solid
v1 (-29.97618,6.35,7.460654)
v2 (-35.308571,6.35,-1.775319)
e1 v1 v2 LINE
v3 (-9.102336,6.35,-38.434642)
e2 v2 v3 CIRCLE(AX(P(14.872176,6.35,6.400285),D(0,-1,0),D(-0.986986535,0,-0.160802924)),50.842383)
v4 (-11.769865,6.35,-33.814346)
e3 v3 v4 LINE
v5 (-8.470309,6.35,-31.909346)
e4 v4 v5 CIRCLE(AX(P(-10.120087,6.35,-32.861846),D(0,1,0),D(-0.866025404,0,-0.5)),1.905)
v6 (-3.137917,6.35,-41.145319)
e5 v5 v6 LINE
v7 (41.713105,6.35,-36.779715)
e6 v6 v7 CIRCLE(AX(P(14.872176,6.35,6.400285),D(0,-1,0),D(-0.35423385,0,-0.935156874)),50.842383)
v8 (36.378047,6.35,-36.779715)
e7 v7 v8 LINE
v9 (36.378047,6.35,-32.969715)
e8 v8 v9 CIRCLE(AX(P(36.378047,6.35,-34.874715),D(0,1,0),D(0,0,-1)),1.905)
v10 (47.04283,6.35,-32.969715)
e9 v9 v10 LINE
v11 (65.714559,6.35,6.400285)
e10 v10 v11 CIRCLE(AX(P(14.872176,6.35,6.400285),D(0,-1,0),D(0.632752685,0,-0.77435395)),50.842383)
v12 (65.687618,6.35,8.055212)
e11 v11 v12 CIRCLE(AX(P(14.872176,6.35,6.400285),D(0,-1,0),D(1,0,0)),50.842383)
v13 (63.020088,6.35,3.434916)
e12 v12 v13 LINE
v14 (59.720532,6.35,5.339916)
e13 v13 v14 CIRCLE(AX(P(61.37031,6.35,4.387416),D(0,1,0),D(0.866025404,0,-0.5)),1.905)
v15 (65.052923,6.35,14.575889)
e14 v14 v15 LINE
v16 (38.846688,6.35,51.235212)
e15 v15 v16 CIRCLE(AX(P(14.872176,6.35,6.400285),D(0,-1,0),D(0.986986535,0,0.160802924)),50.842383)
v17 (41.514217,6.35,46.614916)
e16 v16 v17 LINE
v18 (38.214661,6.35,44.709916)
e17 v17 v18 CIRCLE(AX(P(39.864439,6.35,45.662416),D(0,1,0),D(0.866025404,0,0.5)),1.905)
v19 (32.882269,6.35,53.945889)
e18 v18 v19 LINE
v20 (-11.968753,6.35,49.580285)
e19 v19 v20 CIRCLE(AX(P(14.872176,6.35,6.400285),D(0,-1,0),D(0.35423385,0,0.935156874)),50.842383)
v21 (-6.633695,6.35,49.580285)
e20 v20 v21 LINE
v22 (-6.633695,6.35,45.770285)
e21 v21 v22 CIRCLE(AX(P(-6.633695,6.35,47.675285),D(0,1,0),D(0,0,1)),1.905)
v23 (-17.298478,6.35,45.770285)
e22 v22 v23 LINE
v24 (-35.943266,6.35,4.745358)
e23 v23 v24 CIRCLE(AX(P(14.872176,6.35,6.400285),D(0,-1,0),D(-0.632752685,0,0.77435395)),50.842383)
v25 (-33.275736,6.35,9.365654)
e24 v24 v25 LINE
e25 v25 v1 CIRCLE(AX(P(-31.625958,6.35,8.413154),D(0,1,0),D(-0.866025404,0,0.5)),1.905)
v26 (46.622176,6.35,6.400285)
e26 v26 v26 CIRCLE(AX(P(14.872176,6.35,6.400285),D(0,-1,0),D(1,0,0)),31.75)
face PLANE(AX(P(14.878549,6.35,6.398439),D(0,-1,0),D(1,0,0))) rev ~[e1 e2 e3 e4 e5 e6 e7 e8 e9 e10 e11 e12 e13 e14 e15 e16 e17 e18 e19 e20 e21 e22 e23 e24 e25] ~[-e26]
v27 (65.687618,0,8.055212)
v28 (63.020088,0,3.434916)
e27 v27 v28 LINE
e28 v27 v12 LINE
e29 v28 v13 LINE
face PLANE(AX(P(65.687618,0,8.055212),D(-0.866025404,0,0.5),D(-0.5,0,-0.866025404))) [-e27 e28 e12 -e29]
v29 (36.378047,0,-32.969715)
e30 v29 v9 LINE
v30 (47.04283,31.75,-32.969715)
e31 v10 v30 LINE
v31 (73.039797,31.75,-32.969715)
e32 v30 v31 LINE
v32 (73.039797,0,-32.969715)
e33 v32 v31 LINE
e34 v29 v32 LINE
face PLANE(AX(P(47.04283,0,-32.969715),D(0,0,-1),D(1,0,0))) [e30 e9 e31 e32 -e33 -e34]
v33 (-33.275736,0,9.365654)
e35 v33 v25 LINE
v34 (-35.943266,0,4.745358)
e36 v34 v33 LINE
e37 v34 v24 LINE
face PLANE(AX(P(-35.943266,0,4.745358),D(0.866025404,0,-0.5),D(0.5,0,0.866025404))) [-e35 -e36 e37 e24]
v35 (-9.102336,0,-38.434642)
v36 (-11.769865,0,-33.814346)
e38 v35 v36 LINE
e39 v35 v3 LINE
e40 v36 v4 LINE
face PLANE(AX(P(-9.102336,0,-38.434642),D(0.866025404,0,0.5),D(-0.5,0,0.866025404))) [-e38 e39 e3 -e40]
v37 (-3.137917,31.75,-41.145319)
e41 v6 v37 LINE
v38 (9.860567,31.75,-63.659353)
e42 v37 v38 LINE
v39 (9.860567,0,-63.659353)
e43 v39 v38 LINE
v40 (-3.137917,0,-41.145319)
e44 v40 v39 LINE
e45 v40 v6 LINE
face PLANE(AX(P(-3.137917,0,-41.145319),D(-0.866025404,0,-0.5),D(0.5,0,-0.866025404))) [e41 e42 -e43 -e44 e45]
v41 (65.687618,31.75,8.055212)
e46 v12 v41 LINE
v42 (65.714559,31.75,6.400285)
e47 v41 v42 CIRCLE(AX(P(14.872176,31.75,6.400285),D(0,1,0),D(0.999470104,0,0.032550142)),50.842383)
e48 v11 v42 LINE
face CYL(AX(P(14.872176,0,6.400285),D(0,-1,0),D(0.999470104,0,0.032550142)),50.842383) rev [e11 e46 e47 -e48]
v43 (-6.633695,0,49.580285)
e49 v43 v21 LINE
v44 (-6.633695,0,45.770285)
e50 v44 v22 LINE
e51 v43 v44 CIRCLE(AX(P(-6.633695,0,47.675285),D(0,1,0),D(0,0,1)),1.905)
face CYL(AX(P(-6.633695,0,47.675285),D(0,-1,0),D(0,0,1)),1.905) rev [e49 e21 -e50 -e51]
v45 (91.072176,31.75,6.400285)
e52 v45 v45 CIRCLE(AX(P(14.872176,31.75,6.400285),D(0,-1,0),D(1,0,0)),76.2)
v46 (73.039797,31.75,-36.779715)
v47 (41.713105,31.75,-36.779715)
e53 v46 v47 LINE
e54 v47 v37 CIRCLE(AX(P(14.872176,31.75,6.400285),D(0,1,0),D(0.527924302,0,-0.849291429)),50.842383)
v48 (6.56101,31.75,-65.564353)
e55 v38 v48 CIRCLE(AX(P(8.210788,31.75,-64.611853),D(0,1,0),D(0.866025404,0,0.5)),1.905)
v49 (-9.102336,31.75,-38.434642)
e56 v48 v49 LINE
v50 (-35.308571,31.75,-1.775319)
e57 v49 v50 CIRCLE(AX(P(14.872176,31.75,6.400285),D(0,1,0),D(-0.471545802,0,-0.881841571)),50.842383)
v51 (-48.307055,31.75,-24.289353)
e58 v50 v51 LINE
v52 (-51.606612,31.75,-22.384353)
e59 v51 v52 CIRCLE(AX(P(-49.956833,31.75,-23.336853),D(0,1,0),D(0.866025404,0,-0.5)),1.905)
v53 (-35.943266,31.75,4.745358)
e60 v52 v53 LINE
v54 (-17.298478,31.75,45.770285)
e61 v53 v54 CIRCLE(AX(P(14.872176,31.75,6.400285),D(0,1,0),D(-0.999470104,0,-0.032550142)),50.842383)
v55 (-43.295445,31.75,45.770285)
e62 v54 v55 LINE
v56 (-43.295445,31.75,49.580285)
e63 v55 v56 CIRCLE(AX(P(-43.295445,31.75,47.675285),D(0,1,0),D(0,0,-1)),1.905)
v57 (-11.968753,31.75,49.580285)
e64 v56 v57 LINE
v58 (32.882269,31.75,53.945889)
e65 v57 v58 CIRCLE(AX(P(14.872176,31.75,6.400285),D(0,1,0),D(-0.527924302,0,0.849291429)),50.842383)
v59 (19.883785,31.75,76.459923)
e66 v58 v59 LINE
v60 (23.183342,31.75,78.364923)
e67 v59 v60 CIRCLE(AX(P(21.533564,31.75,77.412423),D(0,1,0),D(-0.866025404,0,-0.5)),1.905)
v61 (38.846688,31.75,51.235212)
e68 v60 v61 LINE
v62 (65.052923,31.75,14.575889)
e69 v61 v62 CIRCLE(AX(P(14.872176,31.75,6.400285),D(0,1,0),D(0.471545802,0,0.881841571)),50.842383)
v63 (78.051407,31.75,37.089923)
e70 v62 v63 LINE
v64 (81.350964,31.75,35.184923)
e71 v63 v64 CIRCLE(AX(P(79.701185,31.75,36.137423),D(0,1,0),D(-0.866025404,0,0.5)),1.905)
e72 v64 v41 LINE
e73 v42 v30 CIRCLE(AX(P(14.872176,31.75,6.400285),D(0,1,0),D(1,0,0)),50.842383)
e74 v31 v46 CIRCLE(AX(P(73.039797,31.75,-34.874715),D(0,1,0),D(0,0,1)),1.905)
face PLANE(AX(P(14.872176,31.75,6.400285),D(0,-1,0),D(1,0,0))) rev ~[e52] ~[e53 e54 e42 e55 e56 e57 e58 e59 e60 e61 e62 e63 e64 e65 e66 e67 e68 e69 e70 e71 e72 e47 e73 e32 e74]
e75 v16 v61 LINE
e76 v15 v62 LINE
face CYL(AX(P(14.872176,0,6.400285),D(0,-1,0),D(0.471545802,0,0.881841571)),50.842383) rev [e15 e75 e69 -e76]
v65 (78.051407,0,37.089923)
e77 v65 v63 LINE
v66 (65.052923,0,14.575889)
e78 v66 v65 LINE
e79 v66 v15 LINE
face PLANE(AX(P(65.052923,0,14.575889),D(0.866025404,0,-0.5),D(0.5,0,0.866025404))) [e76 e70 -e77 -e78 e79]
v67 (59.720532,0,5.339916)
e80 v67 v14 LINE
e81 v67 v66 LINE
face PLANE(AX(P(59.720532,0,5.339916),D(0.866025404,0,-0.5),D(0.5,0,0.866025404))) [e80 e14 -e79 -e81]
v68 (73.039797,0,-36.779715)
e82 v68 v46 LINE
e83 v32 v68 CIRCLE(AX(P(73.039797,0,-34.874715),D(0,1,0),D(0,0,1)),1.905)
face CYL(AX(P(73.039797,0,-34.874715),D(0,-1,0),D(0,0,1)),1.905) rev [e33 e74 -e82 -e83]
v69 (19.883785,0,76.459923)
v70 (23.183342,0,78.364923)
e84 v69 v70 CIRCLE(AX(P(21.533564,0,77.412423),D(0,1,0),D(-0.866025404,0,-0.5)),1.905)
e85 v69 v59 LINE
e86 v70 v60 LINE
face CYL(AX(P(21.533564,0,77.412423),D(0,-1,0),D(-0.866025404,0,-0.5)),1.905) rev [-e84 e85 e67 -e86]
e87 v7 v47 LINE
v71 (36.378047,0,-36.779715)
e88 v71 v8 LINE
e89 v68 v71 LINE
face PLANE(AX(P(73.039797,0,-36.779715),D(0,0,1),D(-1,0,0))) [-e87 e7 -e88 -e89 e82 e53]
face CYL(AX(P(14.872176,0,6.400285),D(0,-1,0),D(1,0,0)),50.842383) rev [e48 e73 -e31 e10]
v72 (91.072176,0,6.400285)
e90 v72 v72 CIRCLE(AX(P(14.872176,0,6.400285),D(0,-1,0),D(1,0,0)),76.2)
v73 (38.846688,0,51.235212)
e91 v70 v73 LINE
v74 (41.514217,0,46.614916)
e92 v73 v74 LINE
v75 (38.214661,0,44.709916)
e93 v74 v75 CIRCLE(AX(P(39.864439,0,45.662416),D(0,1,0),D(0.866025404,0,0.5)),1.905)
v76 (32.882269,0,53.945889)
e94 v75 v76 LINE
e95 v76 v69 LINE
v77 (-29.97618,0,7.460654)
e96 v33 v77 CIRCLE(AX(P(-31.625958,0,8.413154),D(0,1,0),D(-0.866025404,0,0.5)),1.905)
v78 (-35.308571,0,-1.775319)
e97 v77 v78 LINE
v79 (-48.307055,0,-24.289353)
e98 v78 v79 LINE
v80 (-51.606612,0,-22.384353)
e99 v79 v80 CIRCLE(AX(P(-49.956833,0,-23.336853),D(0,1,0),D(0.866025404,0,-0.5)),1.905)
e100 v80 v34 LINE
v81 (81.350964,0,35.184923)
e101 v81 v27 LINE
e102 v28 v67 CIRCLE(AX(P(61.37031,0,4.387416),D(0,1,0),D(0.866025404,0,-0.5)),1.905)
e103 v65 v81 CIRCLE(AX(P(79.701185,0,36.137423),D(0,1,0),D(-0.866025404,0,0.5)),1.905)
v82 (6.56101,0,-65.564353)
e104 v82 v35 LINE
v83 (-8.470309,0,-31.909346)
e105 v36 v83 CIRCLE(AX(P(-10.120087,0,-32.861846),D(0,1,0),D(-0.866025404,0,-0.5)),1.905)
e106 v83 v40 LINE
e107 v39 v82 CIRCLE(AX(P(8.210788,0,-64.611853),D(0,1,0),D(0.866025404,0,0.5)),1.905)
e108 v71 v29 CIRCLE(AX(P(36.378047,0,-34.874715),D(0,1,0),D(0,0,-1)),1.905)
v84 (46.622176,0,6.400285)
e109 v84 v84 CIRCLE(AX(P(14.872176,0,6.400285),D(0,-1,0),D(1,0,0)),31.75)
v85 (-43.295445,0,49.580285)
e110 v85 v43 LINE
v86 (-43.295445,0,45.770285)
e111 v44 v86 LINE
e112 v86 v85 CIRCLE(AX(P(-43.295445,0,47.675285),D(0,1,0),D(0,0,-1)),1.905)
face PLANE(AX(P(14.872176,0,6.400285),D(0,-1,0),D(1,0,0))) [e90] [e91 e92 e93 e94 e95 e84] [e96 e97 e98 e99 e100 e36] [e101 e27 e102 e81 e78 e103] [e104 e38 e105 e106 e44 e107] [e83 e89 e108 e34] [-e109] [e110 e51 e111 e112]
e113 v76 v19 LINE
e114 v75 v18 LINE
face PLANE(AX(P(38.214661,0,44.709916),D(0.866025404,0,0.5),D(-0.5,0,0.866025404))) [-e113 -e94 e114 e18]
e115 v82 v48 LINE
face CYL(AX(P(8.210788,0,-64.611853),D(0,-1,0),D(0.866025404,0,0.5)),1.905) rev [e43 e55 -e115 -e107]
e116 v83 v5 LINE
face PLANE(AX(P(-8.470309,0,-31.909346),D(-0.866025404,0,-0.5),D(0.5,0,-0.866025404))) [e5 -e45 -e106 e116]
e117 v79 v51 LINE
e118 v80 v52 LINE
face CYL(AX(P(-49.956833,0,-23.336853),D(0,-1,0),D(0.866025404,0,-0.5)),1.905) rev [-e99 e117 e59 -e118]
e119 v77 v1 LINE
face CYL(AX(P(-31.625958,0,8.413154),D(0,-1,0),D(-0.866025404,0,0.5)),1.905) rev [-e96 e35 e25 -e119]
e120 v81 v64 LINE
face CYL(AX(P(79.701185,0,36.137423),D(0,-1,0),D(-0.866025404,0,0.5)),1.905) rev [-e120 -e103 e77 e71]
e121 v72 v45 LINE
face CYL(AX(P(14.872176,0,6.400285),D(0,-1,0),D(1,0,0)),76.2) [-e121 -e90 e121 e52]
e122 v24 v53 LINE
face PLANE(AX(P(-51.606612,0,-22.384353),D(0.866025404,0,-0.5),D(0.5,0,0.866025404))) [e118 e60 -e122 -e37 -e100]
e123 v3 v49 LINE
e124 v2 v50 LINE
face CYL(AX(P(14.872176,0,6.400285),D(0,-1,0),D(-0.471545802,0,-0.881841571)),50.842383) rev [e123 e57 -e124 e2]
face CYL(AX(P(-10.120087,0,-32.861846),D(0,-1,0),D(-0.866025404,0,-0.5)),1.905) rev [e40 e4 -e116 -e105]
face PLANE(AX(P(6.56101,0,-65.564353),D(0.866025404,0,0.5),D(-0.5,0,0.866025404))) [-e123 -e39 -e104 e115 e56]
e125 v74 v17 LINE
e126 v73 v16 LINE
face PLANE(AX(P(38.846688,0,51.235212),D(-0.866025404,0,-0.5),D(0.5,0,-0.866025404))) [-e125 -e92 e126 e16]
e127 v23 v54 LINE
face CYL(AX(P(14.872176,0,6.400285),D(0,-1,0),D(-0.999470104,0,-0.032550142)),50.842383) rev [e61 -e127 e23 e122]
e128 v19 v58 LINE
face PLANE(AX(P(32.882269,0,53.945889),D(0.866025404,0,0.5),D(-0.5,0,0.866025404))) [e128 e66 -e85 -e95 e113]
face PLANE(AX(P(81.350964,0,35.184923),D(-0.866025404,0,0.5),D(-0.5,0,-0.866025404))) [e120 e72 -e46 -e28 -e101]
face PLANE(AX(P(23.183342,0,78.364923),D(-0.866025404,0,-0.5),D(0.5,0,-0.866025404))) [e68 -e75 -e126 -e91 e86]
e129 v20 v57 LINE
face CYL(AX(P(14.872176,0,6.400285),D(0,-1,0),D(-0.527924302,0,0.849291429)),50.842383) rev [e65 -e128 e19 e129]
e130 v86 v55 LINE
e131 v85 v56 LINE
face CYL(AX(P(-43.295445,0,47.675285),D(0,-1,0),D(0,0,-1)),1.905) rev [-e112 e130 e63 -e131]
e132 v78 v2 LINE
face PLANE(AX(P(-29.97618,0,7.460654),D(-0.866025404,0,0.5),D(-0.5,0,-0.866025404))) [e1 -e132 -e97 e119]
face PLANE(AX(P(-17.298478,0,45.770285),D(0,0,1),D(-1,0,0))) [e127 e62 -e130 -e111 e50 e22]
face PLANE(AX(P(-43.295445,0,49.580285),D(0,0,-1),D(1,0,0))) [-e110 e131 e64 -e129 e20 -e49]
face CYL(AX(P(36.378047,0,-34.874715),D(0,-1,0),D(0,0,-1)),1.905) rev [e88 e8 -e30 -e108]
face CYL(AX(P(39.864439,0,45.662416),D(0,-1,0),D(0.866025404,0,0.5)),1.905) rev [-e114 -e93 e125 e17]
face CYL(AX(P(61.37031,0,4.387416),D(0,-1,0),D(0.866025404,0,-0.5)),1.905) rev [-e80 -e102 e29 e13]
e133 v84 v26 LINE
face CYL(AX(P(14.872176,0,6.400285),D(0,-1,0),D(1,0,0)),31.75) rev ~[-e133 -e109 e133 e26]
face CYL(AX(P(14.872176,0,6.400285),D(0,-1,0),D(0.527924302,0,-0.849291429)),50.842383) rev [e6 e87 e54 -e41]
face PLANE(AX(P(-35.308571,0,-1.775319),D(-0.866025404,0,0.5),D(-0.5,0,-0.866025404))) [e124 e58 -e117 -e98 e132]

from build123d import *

# Parameters (mm, degrees)
F0_R     = 31.75
F1_DEPTH = 6.35
F0_R_2   = 76.2
F0_R_3   = 74.4988936807
F2_DEPTH = 31.75


# Not quite as in the source:
# - a feature names something its author has since deleted; it is built from what else it names


with BuildPart() as f1:
    # F0 (on Front) → F1 (new body)
    with BuildSketch(Plane.XZ):
        with BuildLine():
            ThreePointArc((47.0428302523, -32.9697150499), (60.8100722022, -15.3863528649), (65.7145588579, 6.4002849501))
            ThreePointArc((65.7145588579, 6.4002849501), (65.7078231144, 7.227857987), (65.6876176686, 8.0552117454))
            Line((65.6876176686, 8.0552117454), (63.0200884494, 3.4349156071))
            ThreePointArc((63.0200884494, 3.4349156071), (60.4178100552, 2.7376372129), (59.720531661, 5.3399156071))
            Line((59.720531661, 5.3399156071), (65.0529232684, 14.5758887971))
            ThreePointArc((65.0529232684, 14.5758887971), (56.2331130755, 35.9675096944), (38.8466881833, 51.2352117455))
            Line((38.8466881833, 51.2352117455), (41.5142174026, 46.6149156071))
            ThreePointArc((41.5142174026, 46.6149156071), (40.8169390084, 44.0126372129), (38.2146606142, 44.7099156071))
            Line((38.2146606142, 44.7099156071), (32.8822690066, 53.9458887971))
            ThreePointArc((32.8822690066, 53.9458887971), (9.9466767851, 57.0035195621), (-11.9687534946, 49.5802849501))
            Line((-11.9687534946, 49.5802849501), (-6.6336950562, 49.5802849501))
            ThreePointArc((-6.6336950562, 49.5802849501), (-4.7286950562, 47.6752849501), (-6.6336950562, 45.7702849501))
            Line((-6.6336950562, 45.7702849501), (-17.2984782711, 45.7702849501))
            ThreePointArc((-17.2984782711, 45.7702849501), (-31.4142602999, 27.4362948179), (-35.9432656874, 4.7453581548))
            Line((-35.9432656874, 4.7453581548), (-33.2757364682, 9.3656542931))
            ThreePointArc((-33.2757364682, 9.3656542931), (-30.673458074, 10.0629326873), (-29.9761796798, 7.4606542931))
            Line((-29.9761796798, 7.4606542931), (-35.3085712873, -1.7753188969))
            ThreePointArc((-35.3085712873, -1.7753188969), (-26.4887610944, -23.1669397942), (-9.1023362022, -38.4346418453))
            Line((-9.1023362022, -38.4346418453), (-11.7698654214, -33.8143457069))
            ThreePointArc((-11.7698654214, -33.8143457069), (-11.0725870272, -31.2120673127), (-8.470308633, -31.9093457069))
            Line((-8.470308633, -31.9093457069), (-3.1379170255, -41.1453188969))
            ThreePointArc((-3.1379170255, -41.1453188969), (19.797675196, -44.202949662), (41.7131054758, -36.7797150499))
            Line((41.7131054758, -36.7797150499), (36.3780470374, -36.7797150499))
            ThreePointArc((36.3780470374, -36.7797150499), (34.4730470374, -34.8747150499), (36.3780470374, -32.9697150499))
            Line((36.3780470374, -32.9697150499), (47.0428302523, -32.9697150499))
        make_face()
        with Locations((14.8721759906, 6.4002849501)):
            Circle(F0_R, mode=Mode.SUBTRACT)
    extrude(amount=-F1_DEPTH)

    # F0 (on Front) → F2 (join)
    with BuildSketch(Plane.XZ):
        with Locations((14.8721759906, 6.4002849501)):
            Circle(F0_R_2)
        with Locations((14.8721759906, 6.4002849501)):
            Circle(F0_R_3, mode=Mode.SUBTRACT)
        with Locations((14.8721759906, 6.4002849501)):
            Circle(F0_R_3)
        with BuildLine():
            ThreePointArc((65.6876176686, 8.0552117454), (65.7078231144, 7.227857987), (65.7145588579, 6.4002849501))
            ThreePointArc((65.7145588579, 6.4002849501), (60.8100722022, -15.3863528649), (47.0428302523, -32.9697150499))
            Line((47.0428302523, -32.9697150499), (73.0397974374, -32.9697150499))
            ThreePointArc((73.0397974374, -32.9697150499), (74.9447974374, -34.8747150499), (73.0397974374, -36.7797150499))
            Line((73.0397974374, -36.7797150499), (41.7131054758, -36.7797150499))
            ThreePointArc((41.7131054758, -36.7797150499), (19.797675196, -44.202949662), (-3.1379170255, -41.1453188969))
            Line((-3.1379170255, -41.1453188969), (9.860566567, -63.6593529005))
            ThreePointArc((9.860566567, -63.6593529005), (9.1632881728, -66.2616312948), (6.5610097786, -65.5643529005))
            Line((6.5610097786, -65.5643529005), (-9.1023362022, -38.4346418453))
            ThreePointArc((-9.1023362022, -38.4346418453), (-26.4887610944, -23.1669397942), (-35.3085712873, -1.7753188969))
            Line((-35.3085712873, -1.7753188969), (-48.3070548798, -24.2893529005))
            ThreePointArc((-48.3070548798, -24.2893529005), (-50.909333274, -24.9866312948), (-51.6066116682, -22.3843529005))
            Line((-51.6066116682, -22.3843529005), (-35.9432656874, 4.7453581548))
            ThreePointArc((-35.9432656874, 4.7453581548), (-31.4142602999, 27.4362948179), (-17.2984782711, 45.7702849501))
            Line((-17.2984782711, 45.7702849501), (-43.2954454562, 45.7702849501))
            ThreePointArc((-43.2954454562, 45.7702849501), (-45.2004454562, 47.6752849501), (-43.2954454562, 49.5802849501))
            Line((-43.2954454562, 49.5802849501), (-11.9687534946, 49.5802849501))
            ThreePointArc((-11.9687534946, 49.5802849501), (9.9466767851, 57.0035195621), (32.8822690066, 53.9458887971))
            Line((32.8822690066, 53.9458887971), (19.8837854141, 76.4599228007))
            ThreePointArc((19.8837854141, 76.4599228007), (20.5810638083, 79.0622011949), (23.1833422025, 78.3649228007))
            Line((23.1833422025, 78.3649228007), (38.8466881833, 51.2352117455))
            ThreePointArc((38.8466881833, 51.2352117455), (56.2331130755, 35.9675096944), (65.0529232684, 14.5758887971))
            Line((65.0529232684, 14.5758887971), (78.051406861, 37.0899228007))
            ThreePointArc((78.051406861, 37.0899228007), (80.6536852552, 37.7872011949), (81.3509636494, 35.1849228007))
            Line((81.3509636494, 35.1849228007), (65.6876176686, 8.0552117454))
        make_face(mode=Mode.SUBTRACT)
    extrude(amount=-F2_DEPTH)


solid = f1.part
